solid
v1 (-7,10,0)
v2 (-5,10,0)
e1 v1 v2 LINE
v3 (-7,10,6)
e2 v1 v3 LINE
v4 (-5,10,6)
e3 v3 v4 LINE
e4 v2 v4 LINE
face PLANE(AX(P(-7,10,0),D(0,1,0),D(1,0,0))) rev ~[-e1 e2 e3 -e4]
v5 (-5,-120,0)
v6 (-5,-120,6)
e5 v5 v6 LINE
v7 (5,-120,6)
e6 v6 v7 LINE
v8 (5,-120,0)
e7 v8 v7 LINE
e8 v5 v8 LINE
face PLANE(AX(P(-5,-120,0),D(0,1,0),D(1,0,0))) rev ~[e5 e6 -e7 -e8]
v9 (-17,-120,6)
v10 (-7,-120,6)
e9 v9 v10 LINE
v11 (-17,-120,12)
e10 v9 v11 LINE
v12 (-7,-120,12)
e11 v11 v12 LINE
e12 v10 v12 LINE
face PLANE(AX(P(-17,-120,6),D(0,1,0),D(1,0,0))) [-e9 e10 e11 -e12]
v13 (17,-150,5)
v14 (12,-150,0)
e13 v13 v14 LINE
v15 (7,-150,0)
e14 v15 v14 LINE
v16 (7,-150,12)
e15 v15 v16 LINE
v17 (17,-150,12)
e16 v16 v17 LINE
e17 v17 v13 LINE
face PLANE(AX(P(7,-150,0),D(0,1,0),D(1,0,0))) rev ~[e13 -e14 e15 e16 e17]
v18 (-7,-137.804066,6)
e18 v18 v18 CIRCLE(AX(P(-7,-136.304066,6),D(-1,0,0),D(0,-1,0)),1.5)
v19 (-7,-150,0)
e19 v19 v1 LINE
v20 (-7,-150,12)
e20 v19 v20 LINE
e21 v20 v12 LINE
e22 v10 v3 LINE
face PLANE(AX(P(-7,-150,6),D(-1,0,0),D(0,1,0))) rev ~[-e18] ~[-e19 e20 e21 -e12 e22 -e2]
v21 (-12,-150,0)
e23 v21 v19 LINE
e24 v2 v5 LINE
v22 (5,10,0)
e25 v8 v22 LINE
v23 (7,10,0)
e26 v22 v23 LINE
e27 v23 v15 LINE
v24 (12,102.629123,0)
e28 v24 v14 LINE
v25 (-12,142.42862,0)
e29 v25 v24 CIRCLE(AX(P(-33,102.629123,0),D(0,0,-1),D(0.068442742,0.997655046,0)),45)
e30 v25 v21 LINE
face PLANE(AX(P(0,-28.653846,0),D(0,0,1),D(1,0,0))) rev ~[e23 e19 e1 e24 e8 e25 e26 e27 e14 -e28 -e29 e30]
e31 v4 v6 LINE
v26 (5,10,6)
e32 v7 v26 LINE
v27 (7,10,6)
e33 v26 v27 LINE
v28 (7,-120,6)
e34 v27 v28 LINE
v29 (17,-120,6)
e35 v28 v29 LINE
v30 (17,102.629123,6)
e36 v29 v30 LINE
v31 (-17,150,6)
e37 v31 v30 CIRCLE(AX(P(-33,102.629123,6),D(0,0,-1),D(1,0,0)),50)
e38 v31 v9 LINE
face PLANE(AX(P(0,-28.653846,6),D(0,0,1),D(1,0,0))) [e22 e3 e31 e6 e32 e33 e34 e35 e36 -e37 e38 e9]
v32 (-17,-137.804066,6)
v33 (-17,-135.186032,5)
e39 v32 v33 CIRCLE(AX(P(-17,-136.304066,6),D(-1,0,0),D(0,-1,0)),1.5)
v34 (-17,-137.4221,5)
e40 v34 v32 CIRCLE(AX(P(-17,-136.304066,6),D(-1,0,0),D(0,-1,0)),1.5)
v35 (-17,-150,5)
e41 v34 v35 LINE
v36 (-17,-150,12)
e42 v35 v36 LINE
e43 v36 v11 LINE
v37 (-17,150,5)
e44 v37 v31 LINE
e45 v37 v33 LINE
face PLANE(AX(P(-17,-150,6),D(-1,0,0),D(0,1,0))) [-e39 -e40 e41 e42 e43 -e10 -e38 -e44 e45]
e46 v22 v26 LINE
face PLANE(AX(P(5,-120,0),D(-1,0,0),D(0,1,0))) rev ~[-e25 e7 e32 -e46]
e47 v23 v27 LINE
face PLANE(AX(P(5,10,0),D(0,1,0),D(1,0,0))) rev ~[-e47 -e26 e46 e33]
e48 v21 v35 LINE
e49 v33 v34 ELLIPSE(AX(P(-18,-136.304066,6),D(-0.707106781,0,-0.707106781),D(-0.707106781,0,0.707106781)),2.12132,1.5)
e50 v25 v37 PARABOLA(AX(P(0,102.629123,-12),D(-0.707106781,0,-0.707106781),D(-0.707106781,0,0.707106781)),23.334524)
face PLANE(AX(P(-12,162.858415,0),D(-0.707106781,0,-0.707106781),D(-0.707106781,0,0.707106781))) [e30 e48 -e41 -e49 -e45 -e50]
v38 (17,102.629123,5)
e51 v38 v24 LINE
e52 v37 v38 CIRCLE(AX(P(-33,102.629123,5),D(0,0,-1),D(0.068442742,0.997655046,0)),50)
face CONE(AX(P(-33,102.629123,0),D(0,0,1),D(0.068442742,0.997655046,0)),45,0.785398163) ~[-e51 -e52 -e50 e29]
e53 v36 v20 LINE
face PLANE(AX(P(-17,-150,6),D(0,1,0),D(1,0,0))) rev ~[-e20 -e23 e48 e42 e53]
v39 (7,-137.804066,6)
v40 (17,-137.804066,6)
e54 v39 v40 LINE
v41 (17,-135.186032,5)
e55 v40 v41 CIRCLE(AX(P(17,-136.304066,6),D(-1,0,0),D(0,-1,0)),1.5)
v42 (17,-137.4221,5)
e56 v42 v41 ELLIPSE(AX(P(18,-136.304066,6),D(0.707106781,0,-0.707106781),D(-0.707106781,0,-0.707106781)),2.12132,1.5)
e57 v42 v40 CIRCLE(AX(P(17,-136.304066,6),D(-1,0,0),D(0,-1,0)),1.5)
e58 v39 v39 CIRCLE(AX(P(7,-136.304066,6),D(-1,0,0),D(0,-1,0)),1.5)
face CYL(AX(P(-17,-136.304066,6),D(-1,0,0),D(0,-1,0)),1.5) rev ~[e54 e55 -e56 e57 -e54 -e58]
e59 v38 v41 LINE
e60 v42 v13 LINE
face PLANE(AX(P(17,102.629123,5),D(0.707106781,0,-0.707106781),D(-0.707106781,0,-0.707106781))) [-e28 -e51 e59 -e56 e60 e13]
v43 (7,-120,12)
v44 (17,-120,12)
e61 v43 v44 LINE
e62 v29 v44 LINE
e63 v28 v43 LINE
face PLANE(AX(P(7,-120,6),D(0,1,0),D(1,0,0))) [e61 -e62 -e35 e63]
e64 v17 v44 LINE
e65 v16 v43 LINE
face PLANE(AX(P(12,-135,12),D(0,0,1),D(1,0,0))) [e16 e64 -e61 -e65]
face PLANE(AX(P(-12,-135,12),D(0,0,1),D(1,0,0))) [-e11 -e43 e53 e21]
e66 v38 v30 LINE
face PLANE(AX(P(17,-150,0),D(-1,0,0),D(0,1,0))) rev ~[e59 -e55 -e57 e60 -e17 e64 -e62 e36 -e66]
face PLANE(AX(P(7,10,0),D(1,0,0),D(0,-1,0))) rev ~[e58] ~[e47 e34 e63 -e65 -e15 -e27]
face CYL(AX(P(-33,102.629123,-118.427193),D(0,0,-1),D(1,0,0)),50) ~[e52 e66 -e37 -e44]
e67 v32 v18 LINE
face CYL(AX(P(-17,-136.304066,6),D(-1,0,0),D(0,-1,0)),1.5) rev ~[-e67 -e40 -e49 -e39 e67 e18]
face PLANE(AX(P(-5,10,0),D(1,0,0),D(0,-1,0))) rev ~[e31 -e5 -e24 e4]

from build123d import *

# Parameters (mm, degrees)
F1_DEPTH    = 6
F2_W        = 10
F2_H        = 30
F3_DEPTH    = 6
F4_R        = 1.5
F5_DEPTH    = 34.001
F6_T1_DEPTH = 242.8543856465
F7_T1_DEPTH = 325.7168298797
F7_T3_DEPTH = 265.4875378105
F7_T6_ANGLE = 86.0754516161


# Not quite as in the source:
# - a fillet or chamfer that OpenCascade refuses, or shapes differently, is made with other operations: its cross-section is extruded or revolved along the edge and cut away or added


with BuildPart() as f1:
    # F0 (on Top) → F1 (new body)
    with BuildSketch(Plane.XY):
        Polygon((7, -150), (17, -150), (17, 150), (-17, 150), (-17, -150), (-7, -150), (-7, 10), (-5, 10), (-5, -120), (5, -120), (5, 10), (7, 10), align=None)
    extrude(amount=F1_DEPTH)

    # F2 (on face) → F3 (join)
    with BuildSketch(Plane.XY.offset(6)):
        with Locations((-12, -135)):
            Rectangle(F2_W, F2_H)
        with Locations((12, -135)):
            Rectangle(F2_W, F2_H)
    extrude(amount=F3_DEPTH)

    # F4 (on face) → F5 (cut, through all)
    with BuildSketch(Plane(origin=(-17, 0, 0), x_dir=(0, -1, 0), z_dir=(-1, 0, 0))):
        with Locations((136.3040655851, 6)):
            Circle(F4_R)
    extrude(amount=-F5_DEPTH, mode=Mode.SUBTRACT)

    # F6: fillet of radius 50 on 1 edges, made by hand

    # F6_s2 → F6_t1 (cut)
    with BuildSketch(Plane.XY.offset(-118.4271928233)):
        with BuildLine():
            ThreePointArc((17, 102.6291228707), (7.6201920232, 131.7838823449), (-17, 150))
            Line((-17, 150), (17, 150))
            Line((17, 150), (17, 102.6291228707))
        make_face()
    extrude(amount=F6_T1_DEPTH, mode=Mode.SUBTRACT)

    # F7: chamfer of 5 on 3 edges, made by hand

    # F7_s2 → F7_t1 (cut)
    with BuildSketch(Plane.XZ.offset(-162.8584149398)):
        Polygon((-12, 0), (-17, 5), (-17, 0), align=None)
    extrude(amount=F7_T1_DEPTH, mode=Mode.SUBTRACT)

    # F7_s4 → F7_t3 (cut)
    with BuildSketch(Plane.XZ.offset(-102.6291228707)):
        Polygon((17, 5), (12, 0), (17, 0), align=None)
    extrude(amount=F7_T3_DEPTH, mode=Mode.SUBTRACT)

    # F7_s5 → F7_t6 (revolve, cut)
    with BuildSketch(Plane(origin=(-39.8531616504, 2.7340709455, 0), x_dir=(0, 0, 1), z_dir=(-0.9976550461, 0.0684427424, 0))):
        Polygon((0, 145.1298518112), (5, 150.1298518112), (0, 150.1298518112), align=None)
    revolve(axis=Axis((-33, 102.6291228707, 0), (0, 0, -1)), revolution_arc=F7_T6_ANGLE, mode=Mode.SUBTRACT)


solid = f1.part
